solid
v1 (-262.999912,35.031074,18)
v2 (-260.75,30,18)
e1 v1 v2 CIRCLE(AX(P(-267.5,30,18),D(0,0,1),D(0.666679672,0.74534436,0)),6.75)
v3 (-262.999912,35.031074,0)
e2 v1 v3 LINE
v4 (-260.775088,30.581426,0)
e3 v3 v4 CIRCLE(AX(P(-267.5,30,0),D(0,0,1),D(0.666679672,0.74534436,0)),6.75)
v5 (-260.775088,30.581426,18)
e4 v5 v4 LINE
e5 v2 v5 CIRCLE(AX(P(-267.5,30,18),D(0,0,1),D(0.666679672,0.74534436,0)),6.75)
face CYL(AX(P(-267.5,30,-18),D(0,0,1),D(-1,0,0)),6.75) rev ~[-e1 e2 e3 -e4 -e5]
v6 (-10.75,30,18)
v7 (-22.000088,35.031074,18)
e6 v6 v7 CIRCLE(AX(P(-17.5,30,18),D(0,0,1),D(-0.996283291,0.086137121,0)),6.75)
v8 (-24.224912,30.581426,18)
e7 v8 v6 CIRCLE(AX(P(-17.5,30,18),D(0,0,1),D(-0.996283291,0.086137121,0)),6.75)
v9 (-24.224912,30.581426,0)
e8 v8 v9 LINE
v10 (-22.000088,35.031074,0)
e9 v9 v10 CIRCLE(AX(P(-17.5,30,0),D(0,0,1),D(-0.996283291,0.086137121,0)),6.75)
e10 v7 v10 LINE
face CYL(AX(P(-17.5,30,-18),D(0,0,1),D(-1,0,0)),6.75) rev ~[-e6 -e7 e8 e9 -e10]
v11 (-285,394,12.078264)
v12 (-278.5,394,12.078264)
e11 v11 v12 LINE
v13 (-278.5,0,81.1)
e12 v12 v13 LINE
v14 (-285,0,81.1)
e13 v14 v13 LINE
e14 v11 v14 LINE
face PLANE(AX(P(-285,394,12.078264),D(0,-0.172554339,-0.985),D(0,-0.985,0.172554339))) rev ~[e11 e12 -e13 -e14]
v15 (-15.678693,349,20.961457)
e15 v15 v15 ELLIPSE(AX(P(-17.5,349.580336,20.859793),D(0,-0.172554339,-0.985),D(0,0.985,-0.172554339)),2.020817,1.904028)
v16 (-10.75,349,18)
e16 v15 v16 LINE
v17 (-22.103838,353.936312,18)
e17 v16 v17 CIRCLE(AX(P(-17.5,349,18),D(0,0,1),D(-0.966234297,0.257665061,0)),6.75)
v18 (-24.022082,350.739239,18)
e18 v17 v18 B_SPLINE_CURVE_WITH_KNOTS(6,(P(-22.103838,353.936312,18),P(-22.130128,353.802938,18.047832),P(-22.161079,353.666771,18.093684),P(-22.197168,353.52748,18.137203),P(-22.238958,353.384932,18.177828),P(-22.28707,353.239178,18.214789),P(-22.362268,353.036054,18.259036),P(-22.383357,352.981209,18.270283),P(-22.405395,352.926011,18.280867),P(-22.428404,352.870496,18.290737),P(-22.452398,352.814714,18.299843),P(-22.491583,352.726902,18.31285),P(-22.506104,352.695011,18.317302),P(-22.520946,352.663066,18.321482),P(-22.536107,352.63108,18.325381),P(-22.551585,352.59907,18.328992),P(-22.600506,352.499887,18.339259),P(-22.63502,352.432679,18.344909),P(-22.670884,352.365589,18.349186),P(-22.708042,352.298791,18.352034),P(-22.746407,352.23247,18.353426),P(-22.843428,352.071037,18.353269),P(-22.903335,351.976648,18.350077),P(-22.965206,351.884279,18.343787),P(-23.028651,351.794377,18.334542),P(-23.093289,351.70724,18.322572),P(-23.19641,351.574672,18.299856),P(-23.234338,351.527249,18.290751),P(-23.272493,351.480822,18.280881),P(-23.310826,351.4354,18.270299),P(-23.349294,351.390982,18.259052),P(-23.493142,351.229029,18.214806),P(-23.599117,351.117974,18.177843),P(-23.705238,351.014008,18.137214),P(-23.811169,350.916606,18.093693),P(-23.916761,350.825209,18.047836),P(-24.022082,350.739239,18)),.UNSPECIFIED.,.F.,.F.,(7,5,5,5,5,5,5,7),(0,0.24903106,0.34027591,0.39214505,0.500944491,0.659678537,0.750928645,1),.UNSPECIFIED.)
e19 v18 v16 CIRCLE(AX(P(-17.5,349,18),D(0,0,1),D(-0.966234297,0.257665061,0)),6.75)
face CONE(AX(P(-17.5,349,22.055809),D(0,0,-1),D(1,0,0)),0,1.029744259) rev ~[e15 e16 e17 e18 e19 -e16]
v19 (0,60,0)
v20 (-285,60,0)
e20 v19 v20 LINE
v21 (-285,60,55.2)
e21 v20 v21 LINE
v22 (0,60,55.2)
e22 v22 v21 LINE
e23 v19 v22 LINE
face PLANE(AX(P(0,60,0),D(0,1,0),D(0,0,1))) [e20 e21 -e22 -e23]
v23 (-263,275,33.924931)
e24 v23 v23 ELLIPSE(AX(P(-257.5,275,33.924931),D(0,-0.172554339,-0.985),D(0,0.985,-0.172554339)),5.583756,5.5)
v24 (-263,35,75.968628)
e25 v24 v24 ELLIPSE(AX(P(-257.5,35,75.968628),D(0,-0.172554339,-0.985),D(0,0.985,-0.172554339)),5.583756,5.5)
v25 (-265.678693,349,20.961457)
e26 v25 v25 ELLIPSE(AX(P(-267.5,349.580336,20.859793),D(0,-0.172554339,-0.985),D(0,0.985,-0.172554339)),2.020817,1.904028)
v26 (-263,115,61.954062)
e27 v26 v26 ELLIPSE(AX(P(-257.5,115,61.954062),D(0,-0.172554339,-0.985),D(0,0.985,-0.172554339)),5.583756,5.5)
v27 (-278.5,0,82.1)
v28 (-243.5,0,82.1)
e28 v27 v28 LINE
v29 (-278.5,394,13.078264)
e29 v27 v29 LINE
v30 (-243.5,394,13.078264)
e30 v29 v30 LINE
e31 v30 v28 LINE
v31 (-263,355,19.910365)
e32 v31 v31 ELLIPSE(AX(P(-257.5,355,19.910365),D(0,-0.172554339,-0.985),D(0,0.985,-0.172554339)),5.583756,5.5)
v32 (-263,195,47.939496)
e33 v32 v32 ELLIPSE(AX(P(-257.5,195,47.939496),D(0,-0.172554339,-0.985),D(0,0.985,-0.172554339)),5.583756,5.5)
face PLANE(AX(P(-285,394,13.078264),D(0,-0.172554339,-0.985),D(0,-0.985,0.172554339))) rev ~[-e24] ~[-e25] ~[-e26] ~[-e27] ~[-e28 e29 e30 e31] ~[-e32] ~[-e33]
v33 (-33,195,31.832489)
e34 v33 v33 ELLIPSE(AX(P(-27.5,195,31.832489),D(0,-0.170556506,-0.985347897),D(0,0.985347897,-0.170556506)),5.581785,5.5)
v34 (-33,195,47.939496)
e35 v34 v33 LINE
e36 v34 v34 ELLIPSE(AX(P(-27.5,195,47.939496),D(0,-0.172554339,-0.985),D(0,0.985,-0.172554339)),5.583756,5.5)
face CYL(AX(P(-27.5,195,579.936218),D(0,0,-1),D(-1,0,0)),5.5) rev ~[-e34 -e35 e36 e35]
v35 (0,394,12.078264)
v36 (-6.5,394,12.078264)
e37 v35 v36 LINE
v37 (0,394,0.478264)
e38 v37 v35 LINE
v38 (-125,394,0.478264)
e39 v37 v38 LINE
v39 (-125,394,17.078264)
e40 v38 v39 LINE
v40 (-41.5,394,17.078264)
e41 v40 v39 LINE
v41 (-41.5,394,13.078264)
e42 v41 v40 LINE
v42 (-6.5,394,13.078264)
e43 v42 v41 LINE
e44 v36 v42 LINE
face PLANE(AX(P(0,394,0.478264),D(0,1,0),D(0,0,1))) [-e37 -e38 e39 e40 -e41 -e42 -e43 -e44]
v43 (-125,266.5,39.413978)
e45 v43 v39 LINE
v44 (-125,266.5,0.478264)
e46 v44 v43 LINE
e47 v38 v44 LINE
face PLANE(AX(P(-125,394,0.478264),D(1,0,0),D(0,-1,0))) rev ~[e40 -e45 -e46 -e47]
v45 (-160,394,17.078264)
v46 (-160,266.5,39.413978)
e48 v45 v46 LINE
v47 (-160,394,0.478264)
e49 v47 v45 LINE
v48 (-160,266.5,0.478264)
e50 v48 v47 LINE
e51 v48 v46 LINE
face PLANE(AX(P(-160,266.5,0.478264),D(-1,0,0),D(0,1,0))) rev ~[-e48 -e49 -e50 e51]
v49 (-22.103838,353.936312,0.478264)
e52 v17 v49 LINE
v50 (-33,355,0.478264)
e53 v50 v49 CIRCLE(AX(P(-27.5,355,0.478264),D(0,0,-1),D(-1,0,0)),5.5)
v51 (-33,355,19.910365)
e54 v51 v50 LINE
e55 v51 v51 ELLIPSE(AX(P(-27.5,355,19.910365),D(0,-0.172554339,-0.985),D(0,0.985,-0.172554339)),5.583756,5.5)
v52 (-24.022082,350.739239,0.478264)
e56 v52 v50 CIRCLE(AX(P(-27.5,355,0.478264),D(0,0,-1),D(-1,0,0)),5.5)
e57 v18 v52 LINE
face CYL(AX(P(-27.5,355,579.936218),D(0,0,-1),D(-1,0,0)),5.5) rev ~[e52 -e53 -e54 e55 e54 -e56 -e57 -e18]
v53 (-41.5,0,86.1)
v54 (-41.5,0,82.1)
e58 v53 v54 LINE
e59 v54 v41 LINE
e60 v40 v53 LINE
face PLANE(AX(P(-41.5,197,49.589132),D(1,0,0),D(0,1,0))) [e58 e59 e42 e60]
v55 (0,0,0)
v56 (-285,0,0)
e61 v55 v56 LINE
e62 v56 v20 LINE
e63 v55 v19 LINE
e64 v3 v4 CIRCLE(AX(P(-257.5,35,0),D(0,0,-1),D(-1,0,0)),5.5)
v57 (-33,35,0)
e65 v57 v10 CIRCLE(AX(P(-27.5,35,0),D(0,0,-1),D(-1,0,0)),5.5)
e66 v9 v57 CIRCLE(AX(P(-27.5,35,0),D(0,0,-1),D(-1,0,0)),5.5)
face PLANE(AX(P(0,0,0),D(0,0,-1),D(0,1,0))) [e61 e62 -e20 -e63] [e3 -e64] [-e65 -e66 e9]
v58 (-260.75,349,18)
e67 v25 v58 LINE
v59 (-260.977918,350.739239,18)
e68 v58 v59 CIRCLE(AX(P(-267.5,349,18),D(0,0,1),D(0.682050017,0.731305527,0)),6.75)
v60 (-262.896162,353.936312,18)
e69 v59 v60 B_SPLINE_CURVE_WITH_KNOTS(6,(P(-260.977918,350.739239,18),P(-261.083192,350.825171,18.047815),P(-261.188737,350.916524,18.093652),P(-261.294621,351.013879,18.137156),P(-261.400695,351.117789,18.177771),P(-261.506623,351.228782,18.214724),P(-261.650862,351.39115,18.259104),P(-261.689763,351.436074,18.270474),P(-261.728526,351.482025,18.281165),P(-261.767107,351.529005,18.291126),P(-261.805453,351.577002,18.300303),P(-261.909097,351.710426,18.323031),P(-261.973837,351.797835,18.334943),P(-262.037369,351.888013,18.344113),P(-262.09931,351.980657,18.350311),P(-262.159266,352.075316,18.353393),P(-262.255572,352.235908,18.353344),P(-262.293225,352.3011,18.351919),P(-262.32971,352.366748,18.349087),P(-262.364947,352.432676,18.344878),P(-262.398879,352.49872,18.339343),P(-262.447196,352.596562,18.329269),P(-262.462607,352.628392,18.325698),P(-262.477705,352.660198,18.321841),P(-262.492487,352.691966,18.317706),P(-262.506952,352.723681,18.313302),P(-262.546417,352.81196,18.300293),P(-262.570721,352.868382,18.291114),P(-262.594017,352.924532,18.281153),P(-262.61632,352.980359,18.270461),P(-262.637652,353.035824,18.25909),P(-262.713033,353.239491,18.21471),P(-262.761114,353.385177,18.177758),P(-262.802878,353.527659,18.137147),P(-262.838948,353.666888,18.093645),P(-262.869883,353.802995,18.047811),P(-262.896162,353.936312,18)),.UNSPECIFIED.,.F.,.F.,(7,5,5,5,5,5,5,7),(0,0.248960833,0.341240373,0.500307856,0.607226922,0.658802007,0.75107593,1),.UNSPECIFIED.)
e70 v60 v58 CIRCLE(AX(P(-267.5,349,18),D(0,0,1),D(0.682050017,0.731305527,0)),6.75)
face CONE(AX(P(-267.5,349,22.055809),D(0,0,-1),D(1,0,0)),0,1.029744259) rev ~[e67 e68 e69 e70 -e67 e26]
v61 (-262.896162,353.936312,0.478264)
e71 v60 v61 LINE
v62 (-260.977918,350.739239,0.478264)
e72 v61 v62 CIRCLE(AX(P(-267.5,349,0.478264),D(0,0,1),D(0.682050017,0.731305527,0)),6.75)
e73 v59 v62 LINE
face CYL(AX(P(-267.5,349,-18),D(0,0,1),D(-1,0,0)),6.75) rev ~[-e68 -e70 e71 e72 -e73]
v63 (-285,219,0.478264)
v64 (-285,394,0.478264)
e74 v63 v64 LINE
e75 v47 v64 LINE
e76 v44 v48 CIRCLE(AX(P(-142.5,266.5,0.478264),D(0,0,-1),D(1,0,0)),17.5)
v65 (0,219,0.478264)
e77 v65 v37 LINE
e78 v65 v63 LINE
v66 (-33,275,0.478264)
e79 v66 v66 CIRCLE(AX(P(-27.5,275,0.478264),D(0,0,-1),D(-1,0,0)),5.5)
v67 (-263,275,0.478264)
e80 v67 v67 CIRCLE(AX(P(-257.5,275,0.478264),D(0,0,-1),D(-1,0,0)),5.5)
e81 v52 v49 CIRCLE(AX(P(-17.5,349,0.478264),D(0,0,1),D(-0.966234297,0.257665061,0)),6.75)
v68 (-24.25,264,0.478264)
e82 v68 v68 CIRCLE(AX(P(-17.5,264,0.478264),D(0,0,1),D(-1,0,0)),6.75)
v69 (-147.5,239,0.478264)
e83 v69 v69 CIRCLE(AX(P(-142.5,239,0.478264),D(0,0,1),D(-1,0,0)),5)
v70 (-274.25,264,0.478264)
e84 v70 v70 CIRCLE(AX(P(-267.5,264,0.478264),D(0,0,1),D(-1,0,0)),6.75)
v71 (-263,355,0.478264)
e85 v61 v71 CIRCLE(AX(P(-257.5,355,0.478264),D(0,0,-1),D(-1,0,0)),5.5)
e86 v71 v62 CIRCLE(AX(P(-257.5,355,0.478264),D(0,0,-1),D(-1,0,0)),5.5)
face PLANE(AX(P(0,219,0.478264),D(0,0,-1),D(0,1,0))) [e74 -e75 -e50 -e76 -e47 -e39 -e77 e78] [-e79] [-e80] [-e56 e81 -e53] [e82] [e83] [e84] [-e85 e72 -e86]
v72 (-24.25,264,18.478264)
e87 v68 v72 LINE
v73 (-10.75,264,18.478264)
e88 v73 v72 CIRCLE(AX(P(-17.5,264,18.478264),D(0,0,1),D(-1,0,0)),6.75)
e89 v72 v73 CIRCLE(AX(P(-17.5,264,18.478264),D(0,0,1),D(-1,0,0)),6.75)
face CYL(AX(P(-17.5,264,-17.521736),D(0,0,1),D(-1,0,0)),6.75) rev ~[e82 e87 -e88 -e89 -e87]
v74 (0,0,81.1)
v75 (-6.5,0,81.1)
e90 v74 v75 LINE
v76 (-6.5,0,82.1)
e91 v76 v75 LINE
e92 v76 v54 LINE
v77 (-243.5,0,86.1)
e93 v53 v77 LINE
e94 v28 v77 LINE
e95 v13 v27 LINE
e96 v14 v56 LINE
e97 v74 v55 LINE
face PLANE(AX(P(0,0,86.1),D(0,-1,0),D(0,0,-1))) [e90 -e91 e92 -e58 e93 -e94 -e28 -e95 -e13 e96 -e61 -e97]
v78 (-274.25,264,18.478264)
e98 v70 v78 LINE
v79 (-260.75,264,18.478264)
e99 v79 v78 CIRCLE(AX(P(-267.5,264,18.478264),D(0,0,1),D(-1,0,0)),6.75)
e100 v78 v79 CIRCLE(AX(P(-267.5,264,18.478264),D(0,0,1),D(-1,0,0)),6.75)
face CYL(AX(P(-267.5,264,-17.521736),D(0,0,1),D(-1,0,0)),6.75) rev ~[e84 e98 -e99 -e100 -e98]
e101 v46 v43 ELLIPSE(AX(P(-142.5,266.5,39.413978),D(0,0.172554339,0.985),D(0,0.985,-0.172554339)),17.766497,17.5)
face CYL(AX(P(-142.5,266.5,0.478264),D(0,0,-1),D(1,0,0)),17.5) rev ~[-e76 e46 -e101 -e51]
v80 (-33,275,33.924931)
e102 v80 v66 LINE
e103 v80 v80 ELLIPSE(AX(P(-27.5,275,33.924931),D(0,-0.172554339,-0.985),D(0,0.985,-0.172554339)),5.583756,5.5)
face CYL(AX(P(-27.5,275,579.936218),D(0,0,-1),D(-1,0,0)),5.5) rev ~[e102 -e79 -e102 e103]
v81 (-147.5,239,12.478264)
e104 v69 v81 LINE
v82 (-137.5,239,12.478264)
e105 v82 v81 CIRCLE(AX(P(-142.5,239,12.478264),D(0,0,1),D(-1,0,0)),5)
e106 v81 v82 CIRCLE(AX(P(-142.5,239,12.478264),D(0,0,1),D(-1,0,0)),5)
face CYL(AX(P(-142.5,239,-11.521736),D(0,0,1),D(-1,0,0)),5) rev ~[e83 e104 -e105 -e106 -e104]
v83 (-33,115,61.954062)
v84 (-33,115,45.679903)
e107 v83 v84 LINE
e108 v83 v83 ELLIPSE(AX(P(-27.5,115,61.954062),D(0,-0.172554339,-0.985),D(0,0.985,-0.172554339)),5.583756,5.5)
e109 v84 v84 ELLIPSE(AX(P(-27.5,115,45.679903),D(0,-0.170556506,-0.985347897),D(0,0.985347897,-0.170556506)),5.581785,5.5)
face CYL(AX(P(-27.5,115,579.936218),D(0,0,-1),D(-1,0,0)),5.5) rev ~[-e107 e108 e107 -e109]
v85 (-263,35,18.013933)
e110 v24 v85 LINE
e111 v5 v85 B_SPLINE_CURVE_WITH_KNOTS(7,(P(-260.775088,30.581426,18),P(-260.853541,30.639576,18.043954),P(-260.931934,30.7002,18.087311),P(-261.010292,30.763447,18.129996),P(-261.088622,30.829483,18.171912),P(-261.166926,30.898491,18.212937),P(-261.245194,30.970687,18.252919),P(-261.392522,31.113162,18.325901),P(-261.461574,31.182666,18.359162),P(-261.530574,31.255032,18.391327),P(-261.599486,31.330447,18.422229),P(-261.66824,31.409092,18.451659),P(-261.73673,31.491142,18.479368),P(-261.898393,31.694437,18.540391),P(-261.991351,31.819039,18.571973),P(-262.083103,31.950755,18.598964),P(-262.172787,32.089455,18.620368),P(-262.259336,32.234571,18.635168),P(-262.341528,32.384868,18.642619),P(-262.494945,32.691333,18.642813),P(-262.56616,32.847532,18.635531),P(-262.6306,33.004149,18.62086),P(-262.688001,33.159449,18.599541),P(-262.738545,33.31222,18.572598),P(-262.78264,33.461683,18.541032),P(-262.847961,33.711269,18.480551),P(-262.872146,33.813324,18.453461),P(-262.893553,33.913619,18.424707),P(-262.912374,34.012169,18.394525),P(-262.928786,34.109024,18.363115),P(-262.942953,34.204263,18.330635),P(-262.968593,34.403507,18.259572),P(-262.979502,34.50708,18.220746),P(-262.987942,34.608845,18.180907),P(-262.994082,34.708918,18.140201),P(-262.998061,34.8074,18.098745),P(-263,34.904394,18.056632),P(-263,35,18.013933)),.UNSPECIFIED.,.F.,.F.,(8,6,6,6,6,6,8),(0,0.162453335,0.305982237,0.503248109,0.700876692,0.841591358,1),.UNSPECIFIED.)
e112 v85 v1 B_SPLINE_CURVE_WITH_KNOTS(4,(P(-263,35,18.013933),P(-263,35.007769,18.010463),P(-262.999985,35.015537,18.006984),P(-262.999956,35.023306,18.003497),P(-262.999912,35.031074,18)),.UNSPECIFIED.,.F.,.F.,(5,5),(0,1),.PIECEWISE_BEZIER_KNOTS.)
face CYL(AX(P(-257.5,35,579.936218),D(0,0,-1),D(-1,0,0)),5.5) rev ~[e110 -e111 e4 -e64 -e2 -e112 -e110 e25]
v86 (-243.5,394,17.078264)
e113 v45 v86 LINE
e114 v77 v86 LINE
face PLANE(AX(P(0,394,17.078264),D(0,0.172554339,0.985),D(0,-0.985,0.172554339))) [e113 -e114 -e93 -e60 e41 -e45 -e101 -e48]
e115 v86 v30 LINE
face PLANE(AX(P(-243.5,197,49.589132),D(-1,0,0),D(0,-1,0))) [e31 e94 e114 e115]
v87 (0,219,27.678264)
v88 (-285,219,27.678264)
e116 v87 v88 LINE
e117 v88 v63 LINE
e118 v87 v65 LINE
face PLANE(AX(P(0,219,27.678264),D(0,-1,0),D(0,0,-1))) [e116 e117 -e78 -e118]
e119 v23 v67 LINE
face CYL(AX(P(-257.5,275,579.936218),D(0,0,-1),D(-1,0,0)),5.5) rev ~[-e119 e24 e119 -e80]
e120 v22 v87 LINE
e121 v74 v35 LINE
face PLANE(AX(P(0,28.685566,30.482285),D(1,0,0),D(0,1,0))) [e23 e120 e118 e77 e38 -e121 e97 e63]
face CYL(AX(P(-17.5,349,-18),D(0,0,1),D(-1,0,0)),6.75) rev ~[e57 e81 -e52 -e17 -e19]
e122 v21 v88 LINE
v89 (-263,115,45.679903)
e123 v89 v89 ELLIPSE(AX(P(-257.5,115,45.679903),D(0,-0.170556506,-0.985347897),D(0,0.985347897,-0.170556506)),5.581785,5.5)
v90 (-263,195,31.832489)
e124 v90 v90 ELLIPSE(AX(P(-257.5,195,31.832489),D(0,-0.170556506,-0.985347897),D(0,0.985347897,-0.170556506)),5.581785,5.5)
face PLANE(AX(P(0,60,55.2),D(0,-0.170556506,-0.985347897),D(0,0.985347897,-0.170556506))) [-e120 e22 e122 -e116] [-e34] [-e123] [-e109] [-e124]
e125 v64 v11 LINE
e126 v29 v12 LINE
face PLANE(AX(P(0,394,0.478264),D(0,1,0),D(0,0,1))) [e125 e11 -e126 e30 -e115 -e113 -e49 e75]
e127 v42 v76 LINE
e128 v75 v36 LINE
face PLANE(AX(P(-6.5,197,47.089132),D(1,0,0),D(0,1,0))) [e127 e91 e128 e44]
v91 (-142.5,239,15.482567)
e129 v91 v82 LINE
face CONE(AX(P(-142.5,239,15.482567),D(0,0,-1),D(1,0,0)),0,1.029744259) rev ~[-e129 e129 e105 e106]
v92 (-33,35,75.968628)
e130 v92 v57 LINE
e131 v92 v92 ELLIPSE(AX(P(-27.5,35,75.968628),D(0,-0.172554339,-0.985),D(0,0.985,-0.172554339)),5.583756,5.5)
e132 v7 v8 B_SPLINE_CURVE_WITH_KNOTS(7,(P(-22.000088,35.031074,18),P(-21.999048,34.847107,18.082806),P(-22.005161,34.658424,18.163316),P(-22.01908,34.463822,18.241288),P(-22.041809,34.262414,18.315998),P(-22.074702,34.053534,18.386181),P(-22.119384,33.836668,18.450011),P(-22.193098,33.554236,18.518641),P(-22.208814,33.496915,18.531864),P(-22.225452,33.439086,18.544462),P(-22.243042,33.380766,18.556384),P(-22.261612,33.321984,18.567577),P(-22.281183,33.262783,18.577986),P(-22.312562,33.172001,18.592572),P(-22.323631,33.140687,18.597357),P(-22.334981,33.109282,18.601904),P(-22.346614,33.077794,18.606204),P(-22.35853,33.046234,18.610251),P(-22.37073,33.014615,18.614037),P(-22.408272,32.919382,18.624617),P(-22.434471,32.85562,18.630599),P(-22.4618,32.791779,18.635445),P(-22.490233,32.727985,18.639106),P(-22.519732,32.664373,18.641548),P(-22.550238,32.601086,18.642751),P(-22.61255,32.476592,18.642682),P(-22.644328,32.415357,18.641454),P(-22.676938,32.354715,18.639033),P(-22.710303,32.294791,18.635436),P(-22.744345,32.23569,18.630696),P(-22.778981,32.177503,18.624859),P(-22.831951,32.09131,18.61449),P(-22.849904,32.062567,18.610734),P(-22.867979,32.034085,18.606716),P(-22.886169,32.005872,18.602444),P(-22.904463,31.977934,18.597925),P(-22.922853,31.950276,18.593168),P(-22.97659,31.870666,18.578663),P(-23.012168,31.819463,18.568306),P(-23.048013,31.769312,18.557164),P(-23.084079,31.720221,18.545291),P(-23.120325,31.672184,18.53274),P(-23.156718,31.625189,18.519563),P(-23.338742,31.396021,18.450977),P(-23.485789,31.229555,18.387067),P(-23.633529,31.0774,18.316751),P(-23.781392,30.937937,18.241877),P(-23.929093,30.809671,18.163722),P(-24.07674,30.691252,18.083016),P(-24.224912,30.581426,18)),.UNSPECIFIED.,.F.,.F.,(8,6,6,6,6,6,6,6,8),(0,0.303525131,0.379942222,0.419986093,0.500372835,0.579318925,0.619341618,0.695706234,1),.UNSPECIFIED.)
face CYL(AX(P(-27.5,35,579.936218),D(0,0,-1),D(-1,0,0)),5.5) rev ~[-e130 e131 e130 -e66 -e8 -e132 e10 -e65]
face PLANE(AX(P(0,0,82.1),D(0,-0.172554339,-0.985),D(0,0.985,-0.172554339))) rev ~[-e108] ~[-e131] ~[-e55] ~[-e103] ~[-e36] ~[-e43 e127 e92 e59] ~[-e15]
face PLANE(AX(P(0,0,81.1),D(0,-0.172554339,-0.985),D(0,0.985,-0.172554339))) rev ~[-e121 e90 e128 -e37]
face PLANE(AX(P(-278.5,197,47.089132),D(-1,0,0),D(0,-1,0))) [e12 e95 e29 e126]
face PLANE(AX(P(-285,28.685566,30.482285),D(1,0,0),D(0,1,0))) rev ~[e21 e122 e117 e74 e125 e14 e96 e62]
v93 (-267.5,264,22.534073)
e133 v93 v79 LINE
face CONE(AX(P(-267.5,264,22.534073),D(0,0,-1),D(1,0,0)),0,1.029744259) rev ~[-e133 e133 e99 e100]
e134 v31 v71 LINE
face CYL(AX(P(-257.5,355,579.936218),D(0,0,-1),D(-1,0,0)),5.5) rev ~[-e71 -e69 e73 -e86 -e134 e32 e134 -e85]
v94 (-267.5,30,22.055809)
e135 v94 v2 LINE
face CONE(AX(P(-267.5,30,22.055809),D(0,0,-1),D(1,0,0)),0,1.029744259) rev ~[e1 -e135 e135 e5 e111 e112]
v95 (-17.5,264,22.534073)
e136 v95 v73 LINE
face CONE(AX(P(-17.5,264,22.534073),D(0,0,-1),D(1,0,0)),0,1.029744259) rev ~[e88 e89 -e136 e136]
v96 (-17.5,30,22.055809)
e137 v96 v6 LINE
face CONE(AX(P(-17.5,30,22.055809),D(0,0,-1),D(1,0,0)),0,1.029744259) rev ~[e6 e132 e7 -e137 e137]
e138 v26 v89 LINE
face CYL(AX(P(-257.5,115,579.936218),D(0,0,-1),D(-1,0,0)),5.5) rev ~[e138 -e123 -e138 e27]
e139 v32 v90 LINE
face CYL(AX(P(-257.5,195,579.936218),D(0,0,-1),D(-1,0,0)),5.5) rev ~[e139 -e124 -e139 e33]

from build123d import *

# Parameters (mm, degrees)
F1_DEPTH  = 285
F3_DEPTH  = 41.5
F5_DEPTH  = 6.5
F7_DEPTH  = 41.5
F8_DEPTH  = 6.5
F13_D     = 11
F15_D     = 13.5
F15_DEPTH = 18
F15_START = 0.4782643
F15_TIP   = 4.0558091784
F17_DEPTH = 85.6227357069
F19_D     = 10
F19_DEPTH = 12
F19_TIP   = 3.0043030951


# Not quite as in the source:
# - a feature names something its author has since deleted; it is built from what else it names


with BuildPart() as f1:
    # F0 (on Right) → F1 (new body)
    with BuildSketch(Plane.YZ):
        Polygon((60, 55.2), (0, 65.8), (0, 0), (60, 0), align=None)
        Polygon((394, 17.0782642931), (0, 86.1), (0, 65.8), (60, 55.2), (219, 27.6782642931), (219, 0.4782642931), (394, 0.4782642931), align=None)
    extrude(amount=-F1_DEPTH)

    # F2 (on face) → F3 (cut)
    with BuildSketch(Plane.YZ):
        Polygon((394, 17.0782642931), (0, 86.1), (0, 82.1), (394, 13.0782642931), align=None)
    extrude(amount=-F3_DEPTH, mode=Mode.SUBTRACT)

    # F4 (on face) → F5 (cut)
    with BuildSketch(Plane.YZ):
        Polygon((394, 13.0782642931), (0, 82.1), (0, 81.1), (394, 12.0782642931), align=None)
    extrude(amount=-F5_DEPTH, mode=Mode.SUBTRACT)

    # F6 (on face) → F7 (cut)
    with BuildSketch(Plane(origin=(-285, 0, 0), x_dir=(0, -1, 0), z_dir=(-1, 0, 0))):
        Polygon((0, 86.1), (-394, 17.0782642931), (-394, 13.0782642931), (0, 82.1), align=None)
    extrude(amount=-F7_DEPTH, mode=Mode.SUBTRACT)

    # F6 (on face) → F8 (cut)
    with BuildSketch(Plane(origin=(-285, 0, 0), x_dir=(0, -1, 0), z_dir=(-1, 0, 0))):
        Polygon((0, 82.1), (-394, 13.0782642931), (-394, 12.0782642931), (0, 81.1), align=None)
    extrude(amount=-F8_DEPTH, mode=Mode.SUBTRACT)

    # F13 (through all)
    with Locations(Plane.XY.offset(86.1)):
        with Locations((-257.5, 355), (-257.5, 275), (-257.5, 195), (-27.5, 355), (-27.5, 275), (-27.5, 195), (-27.5, 115), (-27.5, 35), (-257.5, 115), (-257.5, 35)):
            Hole(F13_D / 2)

    # F15
    # its depths count from where the whole tool has entered the part; down to there all is cleared
    with Locations(Plane(origin=(0, 0, 0), x_dir=(1, 0, 0), z_dir=(0, 0, -1))):
        with Locations((-17.5, -349, 0), (-17.5, -264, -F15_START), (-17.5, -30, 0), (-267.5, -30, 0), (-267.5, -264, -F15_START), (-267.5, -349, 0)):
            Hole(F15_D / 2, depth=F15_DEPTH)
            with Locations((0, 0, -(F15_DEPTH + F15_TIP / 2))):  # 118° drill point
                Cone(0, F15_D / 2, F15_TIP, mode=Mode.SUBTRACT)

    # F16 (on face) → F17 (cut, through all)
    with BuildSketch(Plane(origin=(0, 0, 0.4782642931), x_dir=(1, 0, 0), z_dir=(0, 0, -1))):
        with BuildLine():
            Line((-160, -394), (-125, -394))
            Line((-125, -394), (-125, -266.5))
            ThreePointArc((-125, -266.5), (-142.5, -249), (-160, -266.5))
            Line((-160, -266.5), (-160, -394))
        make_face()
    extrude(amount=-F17_DEPTH, mode=Mode.SUBTRACT)

    # F19
    with Locations(Plane(origin=(0, 0, 0.4782642931), x_dir=(1, 0, 0), z_dir=(0, 0, -1))):
        with Locations((-142.5, -239)):
            Hole(F19_D / 2, depth=F19_DEPTH)
            with Locations((0, 0, -(F19_DEPTH + F19_TIP / 2))):  # 118° drill point
                Cone(0, F19_D / 2, F19_TIP, mode=Mode.SUBTRACT)


solid = f1.part
